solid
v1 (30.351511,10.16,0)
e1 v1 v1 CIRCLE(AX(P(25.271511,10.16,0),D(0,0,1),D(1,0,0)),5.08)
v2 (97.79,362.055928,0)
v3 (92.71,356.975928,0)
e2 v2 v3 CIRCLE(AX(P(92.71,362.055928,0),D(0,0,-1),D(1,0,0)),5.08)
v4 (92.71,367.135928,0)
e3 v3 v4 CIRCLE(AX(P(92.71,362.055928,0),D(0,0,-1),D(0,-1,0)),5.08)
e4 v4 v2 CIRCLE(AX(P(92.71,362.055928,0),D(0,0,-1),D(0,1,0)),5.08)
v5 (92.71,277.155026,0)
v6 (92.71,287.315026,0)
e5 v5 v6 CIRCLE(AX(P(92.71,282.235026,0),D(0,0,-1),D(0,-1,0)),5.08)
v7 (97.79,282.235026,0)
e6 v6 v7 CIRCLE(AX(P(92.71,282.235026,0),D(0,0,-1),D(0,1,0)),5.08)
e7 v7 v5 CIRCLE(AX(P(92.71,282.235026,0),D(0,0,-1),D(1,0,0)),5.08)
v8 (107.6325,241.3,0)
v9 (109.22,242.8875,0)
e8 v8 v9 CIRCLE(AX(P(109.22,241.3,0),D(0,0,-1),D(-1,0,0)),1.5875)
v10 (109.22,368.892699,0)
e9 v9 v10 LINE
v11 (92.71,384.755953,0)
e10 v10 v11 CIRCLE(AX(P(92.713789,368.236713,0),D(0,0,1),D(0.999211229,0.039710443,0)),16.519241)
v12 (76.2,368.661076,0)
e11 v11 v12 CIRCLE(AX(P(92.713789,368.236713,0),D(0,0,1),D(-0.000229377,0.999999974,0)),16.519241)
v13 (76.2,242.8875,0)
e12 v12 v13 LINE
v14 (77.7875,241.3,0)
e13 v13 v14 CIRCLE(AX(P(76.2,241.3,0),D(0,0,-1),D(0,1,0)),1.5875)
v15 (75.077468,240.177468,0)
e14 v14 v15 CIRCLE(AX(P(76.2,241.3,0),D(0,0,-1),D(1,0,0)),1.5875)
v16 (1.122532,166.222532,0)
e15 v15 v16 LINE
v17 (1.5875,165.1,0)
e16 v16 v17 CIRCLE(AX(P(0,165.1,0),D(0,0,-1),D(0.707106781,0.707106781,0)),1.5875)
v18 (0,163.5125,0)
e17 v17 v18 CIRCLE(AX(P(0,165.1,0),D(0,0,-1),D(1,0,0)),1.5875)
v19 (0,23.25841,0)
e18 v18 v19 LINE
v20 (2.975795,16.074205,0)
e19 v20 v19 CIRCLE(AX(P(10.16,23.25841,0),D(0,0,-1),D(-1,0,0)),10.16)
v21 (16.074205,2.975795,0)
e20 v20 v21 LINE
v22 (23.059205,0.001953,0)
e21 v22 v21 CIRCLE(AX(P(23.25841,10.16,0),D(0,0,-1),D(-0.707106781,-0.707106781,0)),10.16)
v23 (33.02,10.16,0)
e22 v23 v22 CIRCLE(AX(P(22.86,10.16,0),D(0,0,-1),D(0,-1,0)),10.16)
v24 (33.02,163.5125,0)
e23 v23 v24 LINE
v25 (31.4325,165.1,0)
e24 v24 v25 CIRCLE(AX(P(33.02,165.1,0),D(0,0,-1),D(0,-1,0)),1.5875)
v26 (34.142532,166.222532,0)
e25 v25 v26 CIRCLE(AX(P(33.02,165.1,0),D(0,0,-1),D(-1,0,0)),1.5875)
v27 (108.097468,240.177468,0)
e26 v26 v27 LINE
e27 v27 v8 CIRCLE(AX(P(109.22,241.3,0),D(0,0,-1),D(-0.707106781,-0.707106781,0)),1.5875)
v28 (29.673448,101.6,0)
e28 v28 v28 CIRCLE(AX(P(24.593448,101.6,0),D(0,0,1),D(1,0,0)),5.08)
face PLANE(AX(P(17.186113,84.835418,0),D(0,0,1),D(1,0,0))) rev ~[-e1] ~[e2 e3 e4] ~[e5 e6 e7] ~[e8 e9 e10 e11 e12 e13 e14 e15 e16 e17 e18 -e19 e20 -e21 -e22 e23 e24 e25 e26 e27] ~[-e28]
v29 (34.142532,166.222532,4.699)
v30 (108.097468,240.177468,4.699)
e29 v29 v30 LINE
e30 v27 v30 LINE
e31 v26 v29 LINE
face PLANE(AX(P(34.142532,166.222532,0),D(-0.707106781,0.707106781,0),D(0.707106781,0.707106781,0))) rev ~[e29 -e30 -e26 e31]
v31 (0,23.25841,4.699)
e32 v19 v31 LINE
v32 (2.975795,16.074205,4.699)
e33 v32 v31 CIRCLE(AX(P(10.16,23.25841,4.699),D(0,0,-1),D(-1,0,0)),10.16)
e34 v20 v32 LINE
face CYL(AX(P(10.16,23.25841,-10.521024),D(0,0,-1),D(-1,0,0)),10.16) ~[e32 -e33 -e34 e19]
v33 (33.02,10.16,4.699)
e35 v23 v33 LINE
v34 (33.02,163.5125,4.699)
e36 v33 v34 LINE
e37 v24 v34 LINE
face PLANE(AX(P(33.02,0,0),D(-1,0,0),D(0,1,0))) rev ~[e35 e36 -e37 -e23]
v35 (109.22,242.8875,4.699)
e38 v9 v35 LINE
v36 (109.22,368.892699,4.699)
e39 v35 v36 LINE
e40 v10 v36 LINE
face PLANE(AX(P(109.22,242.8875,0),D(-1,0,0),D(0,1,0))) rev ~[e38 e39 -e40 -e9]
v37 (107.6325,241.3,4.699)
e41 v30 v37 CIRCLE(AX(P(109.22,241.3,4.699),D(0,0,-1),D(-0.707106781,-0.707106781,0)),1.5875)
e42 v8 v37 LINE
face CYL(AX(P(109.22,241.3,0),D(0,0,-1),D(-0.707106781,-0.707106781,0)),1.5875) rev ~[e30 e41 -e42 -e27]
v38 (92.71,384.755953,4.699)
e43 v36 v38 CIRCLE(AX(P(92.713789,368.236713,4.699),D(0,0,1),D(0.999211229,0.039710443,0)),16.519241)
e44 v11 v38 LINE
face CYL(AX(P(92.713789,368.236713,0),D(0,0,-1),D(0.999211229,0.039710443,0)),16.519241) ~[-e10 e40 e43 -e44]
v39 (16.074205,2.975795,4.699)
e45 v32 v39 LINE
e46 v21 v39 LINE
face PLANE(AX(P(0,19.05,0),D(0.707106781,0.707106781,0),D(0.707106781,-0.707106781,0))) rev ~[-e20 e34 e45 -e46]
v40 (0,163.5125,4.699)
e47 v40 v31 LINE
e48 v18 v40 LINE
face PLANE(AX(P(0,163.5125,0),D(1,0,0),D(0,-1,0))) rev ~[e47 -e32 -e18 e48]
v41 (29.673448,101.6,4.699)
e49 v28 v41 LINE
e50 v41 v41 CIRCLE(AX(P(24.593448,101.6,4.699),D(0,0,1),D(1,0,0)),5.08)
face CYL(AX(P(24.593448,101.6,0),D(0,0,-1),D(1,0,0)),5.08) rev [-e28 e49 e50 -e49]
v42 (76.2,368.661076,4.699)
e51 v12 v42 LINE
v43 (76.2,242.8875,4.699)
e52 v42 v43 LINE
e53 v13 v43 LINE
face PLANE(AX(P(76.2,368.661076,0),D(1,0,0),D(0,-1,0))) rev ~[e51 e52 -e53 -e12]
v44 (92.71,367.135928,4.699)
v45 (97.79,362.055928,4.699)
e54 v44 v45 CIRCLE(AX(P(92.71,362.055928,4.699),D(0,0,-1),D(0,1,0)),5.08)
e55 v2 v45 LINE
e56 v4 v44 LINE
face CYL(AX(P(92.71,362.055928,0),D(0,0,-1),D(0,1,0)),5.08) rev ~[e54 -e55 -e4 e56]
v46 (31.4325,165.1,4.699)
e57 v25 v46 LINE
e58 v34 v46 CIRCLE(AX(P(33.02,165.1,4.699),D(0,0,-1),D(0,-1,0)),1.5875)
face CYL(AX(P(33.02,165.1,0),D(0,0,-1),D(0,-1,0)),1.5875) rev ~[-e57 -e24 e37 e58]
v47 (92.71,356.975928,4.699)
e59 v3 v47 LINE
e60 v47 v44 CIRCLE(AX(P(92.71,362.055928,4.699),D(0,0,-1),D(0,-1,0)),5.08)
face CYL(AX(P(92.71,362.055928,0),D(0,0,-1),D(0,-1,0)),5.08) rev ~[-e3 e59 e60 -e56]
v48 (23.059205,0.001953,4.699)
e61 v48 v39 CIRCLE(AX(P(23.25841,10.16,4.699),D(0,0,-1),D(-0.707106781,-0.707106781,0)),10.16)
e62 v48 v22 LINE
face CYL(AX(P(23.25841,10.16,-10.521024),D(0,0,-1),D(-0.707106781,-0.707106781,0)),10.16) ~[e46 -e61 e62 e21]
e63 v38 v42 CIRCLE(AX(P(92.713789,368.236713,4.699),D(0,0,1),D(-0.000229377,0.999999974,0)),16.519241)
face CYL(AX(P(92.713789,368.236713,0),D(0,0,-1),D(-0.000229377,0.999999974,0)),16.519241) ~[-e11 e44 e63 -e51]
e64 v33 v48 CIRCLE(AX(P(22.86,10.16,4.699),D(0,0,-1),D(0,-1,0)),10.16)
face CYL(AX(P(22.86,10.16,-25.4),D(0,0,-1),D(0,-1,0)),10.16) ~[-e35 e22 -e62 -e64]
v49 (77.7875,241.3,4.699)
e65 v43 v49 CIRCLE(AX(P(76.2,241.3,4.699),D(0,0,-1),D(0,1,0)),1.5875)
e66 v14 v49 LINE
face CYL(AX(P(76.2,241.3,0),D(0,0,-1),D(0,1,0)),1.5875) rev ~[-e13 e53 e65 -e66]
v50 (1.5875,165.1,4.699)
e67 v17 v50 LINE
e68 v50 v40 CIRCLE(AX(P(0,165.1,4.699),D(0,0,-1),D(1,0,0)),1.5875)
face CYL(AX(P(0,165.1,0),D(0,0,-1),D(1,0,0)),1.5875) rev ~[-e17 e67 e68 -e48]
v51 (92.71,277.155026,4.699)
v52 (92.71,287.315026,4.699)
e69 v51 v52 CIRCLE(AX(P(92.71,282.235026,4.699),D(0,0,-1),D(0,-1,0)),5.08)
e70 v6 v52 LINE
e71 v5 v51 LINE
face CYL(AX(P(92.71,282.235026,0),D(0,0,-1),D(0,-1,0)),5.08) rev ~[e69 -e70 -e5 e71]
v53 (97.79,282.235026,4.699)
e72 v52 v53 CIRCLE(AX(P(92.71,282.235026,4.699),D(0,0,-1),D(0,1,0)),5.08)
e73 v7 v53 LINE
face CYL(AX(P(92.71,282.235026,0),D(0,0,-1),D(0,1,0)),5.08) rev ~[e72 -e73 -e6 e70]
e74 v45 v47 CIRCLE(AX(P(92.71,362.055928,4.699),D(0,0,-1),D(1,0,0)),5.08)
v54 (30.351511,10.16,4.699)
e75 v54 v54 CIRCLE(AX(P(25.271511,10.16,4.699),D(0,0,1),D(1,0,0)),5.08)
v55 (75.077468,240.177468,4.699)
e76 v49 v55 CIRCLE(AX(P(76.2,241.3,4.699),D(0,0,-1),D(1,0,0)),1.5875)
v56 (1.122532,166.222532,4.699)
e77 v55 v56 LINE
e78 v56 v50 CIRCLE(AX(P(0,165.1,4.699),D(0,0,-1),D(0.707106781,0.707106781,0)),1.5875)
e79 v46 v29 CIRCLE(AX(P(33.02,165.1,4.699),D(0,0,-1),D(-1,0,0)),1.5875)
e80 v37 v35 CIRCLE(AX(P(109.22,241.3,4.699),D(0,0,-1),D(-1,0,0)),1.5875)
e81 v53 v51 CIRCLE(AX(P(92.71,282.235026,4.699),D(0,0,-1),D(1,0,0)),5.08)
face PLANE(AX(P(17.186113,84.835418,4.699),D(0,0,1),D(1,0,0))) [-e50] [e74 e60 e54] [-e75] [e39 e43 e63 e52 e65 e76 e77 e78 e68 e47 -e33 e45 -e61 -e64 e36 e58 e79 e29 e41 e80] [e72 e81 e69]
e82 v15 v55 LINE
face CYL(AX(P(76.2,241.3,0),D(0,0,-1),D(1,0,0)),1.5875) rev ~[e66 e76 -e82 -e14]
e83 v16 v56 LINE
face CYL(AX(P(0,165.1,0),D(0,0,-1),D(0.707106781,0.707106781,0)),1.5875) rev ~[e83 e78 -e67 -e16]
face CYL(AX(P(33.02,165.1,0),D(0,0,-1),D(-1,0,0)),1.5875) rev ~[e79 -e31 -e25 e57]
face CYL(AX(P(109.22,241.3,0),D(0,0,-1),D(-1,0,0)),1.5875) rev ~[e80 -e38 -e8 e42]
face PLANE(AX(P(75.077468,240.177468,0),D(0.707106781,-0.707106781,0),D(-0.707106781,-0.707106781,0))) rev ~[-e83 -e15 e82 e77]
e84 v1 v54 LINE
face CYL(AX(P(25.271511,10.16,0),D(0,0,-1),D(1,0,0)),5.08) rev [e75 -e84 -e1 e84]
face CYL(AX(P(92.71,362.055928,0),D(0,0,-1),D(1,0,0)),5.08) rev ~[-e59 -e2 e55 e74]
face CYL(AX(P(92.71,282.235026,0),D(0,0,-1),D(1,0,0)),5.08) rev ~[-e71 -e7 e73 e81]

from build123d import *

# Parameters (mm, degrees)
F0_R        = 5.08
F1_DEPTH    = 4.699
F2_T1_DEPTH = 25.7410489686
F2_T3_DEPTH = 55.499


# Not quite as in the source:
# - a fillet or chamfer that OpenCascade refuses, or shapes differently, is made with other operations: its cross-section is extruded or revolved along the edge and cut away or added


with BuildPart() as f1:
    # F0 (on Top) → F1 (new body)
    with BuildSketch(Plane.XY):
        with BuildLine():
            Line((31.4325, 165.1), (1.5875, 165.1))
            ThreePointArc((1.5875, 165.1), (1.1225320151, 163.9774679849), (0, 163.5125))
            Line((0, 163.5125), (0, 19.05))
            Line((0, 19.05), (19.05, 0))
            Line((19.05, 0), (33.02, 0))
            Line((33.02, 0), (33.02, 163.5125))
            ThreePointArc((33.02, 163.5125), (31.8974679849, 163.9774679849), (31.4325, 165.1))
        make_face()
        with Locations((25.2715107054, 10.16)):
            Circle(F0_R, mode=Mode.SUBTRACT)
        with Locations((24.5934482664, 101.6)):
            Circle(F0_R, mode=Mode.SUBTRACT)
        with BuildLine():
            Line((76.2, 368.6610758305), (76.2, 242.8875))
            ThreePointArc((76.2, 242.8875), (77.3225320151, 242.4225320151), (77.7875, 241.3))
            Line((77.7875, 241.3), (92.71, 241.3))
            Line((92.71, 241.3), (92.71, 277.1550263596))
            ThreePointArc((92.71, 277.1550263596), (87.63, 282.2350263596), (92.71, 287.3150263596))
            Line((92.71, 287.3150263596), (92.71, 356.975927515))
            ThreePointArc((92.71, 356.975927515), (87.63, 362.055927515), (92.71, 367.135927515))
            Line((92.71, 367.135927515), (92.71, 384.755953431))
            ThreePointArc((92.71, 384.755953431), (81.1825763095, 380.0653413474), (76.2, 368.6610758305))
        make_face()
        with BuildLine():
            Line((92.71, 277.1550263596), (92.71, 241.3))
            Line((92.71, 241.3), (107.6325, 241.3))
            ThreePointArc((107.6325, 241.3), (108.0974679849, 242.4225320151), (109.22, 242.8875))
            Line((109.22, 242.8875), (109.22, 368.8926994801))
            ThreePointArc((109.22, 368.8926994801), (104.1590146553, 380.148561327), (92.71, 384.755953431))
            Line((92.71, 384.755953431), (92.71, 367.135927515))
            ThreePointArc((92.71, 367.135927515), (96.3021024484, 365.6480299635), (97.79, 362.055927515))
            ThreePointArc((97.79, 362.055927515), (96.3021024484, 358.4638250666), (92.71, 356.975927515))
            Line((92.71, 356.975927515), (92.71, 287.3150263596))
            ThreePointArc((92.71, 287.3150263596), (96.3021024484, 285.827128808), (97.79, 282.2350263596))
            ThreePointArc((97.79, 282.2350263596), (96.3021024484, 278.6429239111), (92.71, 277.1550263596))
        make_face()
        with BuildLine():
            ThreePointArc((1.1225320151, 166.2225320151), (1.4666587579, 165.7075099489), (1.5875, 165.1))
            Line((1.5875, 165.1), (31.4325, 165.1))
            ThreePointArc((31.4325, 165.1), (32.4124900511, 166.5666587579), (34.1425320151, 166.2225320151))
            Line((34.1425320151, 166.2225320151), (108.0974679849, 240.1774679849))
            ThreePointArc((108.0974679849, 240.1774679849), (107.7533412421, 240.6924900511), (107.6325, 241.3))
            Line((107.6325, 241.3), (92.71, 241.3))
            Line((92.71, 241.3), (77.7875, 241.3))
            ThreePointArc((77.7875, 241.3), (76.8075099489, 239.8333412421), (75.0774679849, 240.1774679849))
            Line((75.0774679849, 240.1774679849), (1.1225320151, 166.2225320151))
        make_face()
    extrude(amount=F1_DEPTH)

    # F2: fillet of radius 10.16 on 3 edges, made by hand

    # F2_s2 → F2_t1 (cut)
    with BuildSketch(Plane.XY.offset(-10.5210244843)):
        with BuildLine():
            ThreePointArc((0, 23.2584097937), (0.7733839497, 19.3703461209), (2.9757951031, 16.0742048969))
            Line((2.9757951031, 16.0742048969), (0, 19.05))
            Line((0, 19.05), (0, 23.2584097937))
        make_face()
        with BuildLine():
            ThreePointArc((16.0742048969, 2.9757951031), (19.3703461209, 0.7733839497), (23.2584097937, 0))
            Line((23.2584097937, 0), (19.05, 0))
            Line((19.05, 0), (16.0742048969, 2.9757951031))
        make_face()
    extrude(amount=F2_T1_DEPTH, mode=Mode.SUBTRACT)

    # F2_s4 → F2_t3 (cut)
    with BuildSketch(Plane.XY.offset(-25.4)):
        with BuildLine():
            ThreePointArc((22.86, 0), (30.0442048969, 2.9757951031), (33.02, 10.16))
            Line((33.02, 10.16), (33.02, 0))
            Line((33.02, 0), (22.86, 0))
        make_face()
    extrude(amount=F2_T3_DEPTH, mode=Mode.SUBTRACT)


solid = f1.part
